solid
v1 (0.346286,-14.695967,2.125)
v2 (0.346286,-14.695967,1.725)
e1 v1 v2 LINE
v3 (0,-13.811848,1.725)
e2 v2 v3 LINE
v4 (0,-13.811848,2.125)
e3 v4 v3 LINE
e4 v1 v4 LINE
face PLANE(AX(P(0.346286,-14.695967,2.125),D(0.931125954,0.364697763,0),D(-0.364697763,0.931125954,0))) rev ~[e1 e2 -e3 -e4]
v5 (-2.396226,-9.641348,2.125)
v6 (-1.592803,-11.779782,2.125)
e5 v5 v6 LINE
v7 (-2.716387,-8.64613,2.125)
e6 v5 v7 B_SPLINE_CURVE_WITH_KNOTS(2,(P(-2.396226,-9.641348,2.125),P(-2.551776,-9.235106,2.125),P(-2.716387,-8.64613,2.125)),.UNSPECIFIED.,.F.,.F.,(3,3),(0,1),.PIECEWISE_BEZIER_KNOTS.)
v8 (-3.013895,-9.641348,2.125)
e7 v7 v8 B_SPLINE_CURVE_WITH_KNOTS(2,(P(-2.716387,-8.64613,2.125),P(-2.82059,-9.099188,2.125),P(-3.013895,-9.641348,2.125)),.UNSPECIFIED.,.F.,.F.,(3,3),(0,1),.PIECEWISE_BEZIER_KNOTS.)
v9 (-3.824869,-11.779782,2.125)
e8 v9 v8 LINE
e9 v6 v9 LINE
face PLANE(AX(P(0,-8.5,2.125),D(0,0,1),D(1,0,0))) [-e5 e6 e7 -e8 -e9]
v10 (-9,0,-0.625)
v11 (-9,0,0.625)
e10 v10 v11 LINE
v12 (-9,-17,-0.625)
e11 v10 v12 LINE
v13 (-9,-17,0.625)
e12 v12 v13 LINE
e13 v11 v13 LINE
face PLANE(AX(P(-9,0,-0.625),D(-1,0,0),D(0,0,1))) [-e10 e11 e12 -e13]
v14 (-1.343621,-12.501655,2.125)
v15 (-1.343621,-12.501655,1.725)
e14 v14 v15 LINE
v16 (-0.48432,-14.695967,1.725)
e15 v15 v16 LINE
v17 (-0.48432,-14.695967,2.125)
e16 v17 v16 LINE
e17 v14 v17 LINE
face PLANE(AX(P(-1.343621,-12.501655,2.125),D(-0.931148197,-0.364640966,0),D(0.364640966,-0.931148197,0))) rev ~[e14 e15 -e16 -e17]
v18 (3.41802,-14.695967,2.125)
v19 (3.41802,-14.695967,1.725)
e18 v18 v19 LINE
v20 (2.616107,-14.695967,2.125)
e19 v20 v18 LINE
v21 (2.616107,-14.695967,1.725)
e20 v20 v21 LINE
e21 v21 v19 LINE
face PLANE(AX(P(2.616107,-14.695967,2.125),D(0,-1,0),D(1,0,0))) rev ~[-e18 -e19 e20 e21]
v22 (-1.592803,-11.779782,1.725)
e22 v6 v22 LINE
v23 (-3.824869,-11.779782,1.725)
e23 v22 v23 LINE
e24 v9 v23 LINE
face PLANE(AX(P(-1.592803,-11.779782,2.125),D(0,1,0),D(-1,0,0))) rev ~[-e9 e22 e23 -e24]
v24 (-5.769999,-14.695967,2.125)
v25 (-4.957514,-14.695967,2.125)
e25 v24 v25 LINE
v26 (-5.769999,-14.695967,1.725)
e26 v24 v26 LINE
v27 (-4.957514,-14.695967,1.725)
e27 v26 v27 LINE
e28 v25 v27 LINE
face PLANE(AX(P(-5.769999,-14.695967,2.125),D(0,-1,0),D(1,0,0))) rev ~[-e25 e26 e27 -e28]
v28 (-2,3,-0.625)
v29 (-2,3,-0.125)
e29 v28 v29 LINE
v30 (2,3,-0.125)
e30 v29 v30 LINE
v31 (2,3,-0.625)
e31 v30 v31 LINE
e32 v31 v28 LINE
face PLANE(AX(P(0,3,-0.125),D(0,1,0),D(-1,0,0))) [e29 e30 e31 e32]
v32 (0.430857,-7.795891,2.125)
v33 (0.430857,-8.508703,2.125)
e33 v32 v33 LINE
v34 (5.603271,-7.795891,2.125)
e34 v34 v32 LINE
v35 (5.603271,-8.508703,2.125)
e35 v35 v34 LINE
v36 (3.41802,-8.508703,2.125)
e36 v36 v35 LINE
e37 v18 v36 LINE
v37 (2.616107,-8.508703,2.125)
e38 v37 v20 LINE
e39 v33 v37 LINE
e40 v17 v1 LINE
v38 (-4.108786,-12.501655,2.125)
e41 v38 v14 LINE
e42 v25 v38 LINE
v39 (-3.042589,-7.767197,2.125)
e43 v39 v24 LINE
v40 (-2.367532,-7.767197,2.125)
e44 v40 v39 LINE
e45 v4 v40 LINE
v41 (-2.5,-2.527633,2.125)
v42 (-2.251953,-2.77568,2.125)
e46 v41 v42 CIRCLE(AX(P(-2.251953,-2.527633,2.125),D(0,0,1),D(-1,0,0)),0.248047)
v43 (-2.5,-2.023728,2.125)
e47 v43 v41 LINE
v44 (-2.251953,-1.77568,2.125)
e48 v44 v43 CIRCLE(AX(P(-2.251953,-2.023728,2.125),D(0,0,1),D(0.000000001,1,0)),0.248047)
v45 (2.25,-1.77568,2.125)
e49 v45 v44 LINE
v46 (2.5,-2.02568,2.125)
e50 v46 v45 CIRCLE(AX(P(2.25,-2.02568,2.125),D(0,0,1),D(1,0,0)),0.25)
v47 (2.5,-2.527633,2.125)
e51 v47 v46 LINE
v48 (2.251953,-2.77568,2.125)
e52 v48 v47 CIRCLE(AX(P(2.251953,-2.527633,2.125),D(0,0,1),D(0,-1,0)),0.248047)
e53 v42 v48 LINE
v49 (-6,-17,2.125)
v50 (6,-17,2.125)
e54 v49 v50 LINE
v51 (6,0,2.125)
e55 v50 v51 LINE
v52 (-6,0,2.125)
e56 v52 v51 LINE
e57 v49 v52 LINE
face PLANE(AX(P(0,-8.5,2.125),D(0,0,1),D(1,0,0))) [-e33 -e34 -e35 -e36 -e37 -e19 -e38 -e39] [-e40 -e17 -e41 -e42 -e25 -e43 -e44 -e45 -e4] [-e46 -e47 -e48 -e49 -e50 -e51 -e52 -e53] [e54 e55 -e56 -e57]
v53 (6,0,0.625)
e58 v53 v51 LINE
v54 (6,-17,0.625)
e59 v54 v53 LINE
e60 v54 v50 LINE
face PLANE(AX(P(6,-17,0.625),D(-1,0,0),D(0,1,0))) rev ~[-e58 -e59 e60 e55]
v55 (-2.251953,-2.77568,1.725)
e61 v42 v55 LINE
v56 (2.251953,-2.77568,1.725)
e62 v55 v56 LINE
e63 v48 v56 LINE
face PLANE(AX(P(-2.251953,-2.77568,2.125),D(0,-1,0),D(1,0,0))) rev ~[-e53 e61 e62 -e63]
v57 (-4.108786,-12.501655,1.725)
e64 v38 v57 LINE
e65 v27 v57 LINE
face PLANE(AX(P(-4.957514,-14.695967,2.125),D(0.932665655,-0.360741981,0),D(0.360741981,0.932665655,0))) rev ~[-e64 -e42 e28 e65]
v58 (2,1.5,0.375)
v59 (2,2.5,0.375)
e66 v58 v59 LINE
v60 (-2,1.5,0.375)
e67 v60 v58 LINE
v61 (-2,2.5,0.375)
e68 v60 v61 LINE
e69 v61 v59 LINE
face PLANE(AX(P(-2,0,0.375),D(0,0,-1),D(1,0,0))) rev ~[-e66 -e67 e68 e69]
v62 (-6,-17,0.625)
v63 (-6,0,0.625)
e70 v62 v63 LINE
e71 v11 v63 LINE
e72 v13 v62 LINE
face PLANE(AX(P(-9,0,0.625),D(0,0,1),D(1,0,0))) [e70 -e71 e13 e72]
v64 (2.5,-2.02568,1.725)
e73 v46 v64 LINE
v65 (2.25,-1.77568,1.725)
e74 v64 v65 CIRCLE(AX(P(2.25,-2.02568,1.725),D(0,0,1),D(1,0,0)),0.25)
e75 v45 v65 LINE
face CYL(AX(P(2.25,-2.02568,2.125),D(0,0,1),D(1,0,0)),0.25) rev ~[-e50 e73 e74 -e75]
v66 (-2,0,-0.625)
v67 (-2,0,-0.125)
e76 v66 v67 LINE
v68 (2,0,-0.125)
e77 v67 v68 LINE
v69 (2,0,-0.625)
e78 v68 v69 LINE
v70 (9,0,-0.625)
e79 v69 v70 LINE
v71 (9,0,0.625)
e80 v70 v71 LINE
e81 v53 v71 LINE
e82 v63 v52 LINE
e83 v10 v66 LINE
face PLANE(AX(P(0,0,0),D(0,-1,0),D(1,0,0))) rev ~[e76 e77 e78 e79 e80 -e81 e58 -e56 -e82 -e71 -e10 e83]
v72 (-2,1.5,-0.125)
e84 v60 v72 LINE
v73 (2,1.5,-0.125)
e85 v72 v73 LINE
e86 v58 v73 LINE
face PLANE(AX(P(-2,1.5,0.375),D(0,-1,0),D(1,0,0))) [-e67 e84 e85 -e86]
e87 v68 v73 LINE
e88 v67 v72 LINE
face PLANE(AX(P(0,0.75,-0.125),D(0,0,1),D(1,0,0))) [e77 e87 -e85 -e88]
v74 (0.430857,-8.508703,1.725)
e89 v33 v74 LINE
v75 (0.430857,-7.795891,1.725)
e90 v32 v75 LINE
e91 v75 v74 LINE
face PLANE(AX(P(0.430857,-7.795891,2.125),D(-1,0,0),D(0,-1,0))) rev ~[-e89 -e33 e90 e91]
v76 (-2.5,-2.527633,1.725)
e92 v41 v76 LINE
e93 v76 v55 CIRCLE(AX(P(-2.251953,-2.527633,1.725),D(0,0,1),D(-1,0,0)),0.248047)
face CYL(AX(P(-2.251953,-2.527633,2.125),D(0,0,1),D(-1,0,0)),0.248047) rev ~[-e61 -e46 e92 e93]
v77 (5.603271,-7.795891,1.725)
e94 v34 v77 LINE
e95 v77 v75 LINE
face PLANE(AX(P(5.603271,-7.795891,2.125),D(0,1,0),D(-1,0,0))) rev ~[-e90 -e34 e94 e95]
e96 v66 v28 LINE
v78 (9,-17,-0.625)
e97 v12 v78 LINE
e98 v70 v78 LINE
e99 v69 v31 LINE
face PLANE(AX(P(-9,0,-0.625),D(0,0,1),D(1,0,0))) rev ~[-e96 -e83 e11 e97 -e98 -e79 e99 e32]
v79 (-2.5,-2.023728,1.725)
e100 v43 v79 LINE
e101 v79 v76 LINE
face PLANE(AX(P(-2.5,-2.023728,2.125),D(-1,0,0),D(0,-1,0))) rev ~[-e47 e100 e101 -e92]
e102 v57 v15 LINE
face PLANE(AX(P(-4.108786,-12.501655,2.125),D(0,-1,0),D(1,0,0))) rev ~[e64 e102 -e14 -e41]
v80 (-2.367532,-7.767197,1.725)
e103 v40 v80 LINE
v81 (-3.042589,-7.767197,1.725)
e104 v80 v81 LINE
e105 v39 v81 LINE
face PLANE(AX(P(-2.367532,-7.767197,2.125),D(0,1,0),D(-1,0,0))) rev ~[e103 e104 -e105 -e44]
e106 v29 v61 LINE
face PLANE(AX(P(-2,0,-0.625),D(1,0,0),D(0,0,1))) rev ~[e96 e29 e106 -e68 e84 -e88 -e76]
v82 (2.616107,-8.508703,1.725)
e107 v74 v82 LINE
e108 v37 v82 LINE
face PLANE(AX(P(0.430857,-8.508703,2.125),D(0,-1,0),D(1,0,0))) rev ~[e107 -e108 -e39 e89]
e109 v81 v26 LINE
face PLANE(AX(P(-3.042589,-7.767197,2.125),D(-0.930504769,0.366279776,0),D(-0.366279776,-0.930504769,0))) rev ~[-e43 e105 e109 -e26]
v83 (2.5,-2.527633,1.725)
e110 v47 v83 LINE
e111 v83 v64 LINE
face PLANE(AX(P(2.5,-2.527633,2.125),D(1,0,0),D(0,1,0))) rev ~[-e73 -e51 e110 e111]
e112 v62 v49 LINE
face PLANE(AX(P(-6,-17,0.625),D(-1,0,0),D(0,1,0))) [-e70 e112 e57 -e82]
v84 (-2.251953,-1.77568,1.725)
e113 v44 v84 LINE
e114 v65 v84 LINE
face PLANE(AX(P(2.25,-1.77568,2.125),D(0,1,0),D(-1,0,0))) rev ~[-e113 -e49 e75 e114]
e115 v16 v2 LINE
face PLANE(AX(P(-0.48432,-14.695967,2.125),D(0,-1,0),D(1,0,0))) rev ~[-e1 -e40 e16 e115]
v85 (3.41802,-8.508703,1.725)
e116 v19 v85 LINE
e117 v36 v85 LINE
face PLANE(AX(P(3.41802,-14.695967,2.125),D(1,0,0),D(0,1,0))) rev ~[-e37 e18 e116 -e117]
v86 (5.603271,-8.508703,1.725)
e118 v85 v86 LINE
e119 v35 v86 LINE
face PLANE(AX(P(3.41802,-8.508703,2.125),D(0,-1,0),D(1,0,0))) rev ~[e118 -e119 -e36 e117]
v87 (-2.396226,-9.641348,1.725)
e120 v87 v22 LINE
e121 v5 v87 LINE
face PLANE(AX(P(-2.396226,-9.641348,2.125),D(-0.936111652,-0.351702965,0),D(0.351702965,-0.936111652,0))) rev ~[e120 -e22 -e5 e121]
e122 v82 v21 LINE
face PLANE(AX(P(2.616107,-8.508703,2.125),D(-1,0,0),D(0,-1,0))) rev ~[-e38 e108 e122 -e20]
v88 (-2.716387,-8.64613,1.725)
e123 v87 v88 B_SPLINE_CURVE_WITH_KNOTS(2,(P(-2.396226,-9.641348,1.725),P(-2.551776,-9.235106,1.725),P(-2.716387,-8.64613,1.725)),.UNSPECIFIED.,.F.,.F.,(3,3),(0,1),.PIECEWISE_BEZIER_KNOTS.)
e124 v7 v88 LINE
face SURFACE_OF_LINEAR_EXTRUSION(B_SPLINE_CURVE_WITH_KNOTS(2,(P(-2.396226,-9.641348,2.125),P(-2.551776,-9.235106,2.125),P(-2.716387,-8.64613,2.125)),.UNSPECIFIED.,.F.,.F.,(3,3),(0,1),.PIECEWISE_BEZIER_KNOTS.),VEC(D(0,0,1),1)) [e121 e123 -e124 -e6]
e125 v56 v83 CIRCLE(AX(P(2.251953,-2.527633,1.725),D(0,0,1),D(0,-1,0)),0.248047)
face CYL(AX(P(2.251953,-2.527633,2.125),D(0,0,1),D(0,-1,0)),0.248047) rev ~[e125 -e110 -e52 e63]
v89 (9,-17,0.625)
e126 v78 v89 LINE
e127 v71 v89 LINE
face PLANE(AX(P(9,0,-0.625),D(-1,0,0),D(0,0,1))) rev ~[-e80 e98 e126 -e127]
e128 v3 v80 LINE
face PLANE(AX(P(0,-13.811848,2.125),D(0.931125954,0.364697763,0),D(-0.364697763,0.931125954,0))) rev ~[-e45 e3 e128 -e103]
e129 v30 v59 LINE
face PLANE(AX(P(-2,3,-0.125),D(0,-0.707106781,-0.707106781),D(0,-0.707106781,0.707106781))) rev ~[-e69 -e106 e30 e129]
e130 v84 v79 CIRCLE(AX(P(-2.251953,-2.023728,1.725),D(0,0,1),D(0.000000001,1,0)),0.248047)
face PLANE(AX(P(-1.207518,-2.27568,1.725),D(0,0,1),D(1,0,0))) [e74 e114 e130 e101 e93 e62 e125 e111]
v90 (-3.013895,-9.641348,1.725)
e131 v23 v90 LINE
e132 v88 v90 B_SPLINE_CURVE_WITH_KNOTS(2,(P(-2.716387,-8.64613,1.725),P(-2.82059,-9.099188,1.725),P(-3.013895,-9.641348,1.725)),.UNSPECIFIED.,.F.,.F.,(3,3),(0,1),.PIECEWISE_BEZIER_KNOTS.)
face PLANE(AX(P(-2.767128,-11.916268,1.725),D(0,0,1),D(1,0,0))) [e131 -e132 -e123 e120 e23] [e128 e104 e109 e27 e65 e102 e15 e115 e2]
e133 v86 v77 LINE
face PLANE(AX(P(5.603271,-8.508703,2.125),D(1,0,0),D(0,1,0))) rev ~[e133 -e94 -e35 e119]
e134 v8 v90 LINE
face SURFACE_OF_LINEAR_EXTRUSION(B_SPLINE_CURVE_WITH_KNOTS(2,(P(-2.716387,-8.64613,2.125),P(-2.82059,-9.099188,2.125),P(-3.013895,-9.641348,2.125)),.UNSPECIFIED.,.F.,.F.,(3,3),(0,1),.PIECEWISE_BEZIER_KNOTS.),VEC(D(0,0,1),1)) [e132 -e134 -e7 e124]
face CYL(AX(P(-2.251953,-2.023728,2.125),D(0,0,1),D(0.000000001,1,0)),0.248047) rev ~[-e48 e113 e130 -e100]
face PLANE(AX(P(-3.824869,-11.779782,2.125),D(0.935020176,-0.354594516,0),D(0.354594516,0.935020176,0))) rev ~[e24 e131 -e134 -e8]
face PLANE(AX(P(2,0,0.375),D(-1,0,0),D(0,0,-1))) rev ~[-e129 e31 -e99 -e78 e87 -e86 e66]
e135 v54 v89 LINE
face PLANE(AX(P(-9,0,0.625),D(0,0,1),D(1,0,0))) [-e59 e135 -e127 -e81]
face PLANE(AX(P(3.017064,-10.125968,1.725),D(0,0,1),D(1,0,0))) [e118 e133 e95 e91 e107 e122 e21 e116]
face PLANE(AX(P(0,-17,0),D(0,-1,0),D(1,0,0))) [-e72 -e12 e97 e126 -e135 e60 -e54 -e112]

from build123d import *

# Parameters (mm, degrees)
F0_W      = 18
F0_H      = 1.25
F1_DEPTH  = 17
F2_W      = 12
F2_H      = 17
F3_DEPTH  = 1.5
F5_DEPTH  = 3
F6_W      = 4
F6_H      = 1.5
F7_DEPTH  = 0.5
F9_DEPTH  = 25
F11_DEPTH = 0.4


with BuildPart() as f1:
    # F0 (on Front) → F1 (new body)
    with BuildSketch(Plane.XZ):
        Rectangle(F0_W, F0_H)
    extrude(amount=F1_DEPTH)

    # F2 (on face) → F3 (join)
    with BuildSketch(Plane.XY.offset(0.625)):
        with Locations((0, -8.5)):
            Rectangle(F2_W, F2_H)
    extrude(amount=F3_DEPTH)

    # F4 (on face) → F5 (join)
    with BuildSketch(Plane(origin=(0, 0, 0), x_dir=(-1, 0, 0), z_dir=(0, 1, 0))):
        Polygon((-2, 0.375), (-2, -0.625), (0, -0.625), (2, -0.625), (2, 0.375), align=None)
    extrude(amount=F5_DEPTH)

    # F6 (on face) → F7 (cut)
    with BuildSketch(Plane.XY.offset(0.375)):
        with Locations((0, 0.75)):
            Rectangle(F6_W, F6_H)
    extrude(amount=-F7_DEPTH, mode=Mode.SUBTRACT)

    # F8 (on face) → F9 (cut)
    with BuildSketch(Plane(origin=(-2, 0, 0), x_dir=(0, -1, 0), z_dir=(-1, 0, 0))):
        Polygon((-3, 0.375), (-3, -0.125), (-2.5, 0.375), align=None)
    extrude(amount=-F9_DEPTH, mode=Mode.SUBTRACT)

    # F10 (on face) → F11 (cut)
    with BuildSketch(Plane.XY.offset(2.125)):
        with BuildLine():
            Line((0, -2.7756802738), (0, -1.7756802738))
            Line((0, -1.7756802738), (-2.2519526784, -1.7756802738))
            ThreePointArc((-2.2519526784, -1.7756802738), (-2.4273486216, -1.8483316522), (-2.5, -2.0237275953))
            Line((-2.5, -2.0237275953), (-2.5, -2.5276329522))
            ThreePointArc((-2.5, -2.5276329522), (-2.4273486216, -2.7030288953), (-2.2519526784, -2.7756802738))
            Line((-2.2519526784, -2.7756802738), (0, -2.7756802738))
        make_face()
        with BuildLine():
            Line((2.25, -1.7756802738), (0, -1.7756802738))
            Line((0, -1.7756802738), (0, -2.7756802738))
            Line((0, -2.7756802738), (2.2519526784, -2.7756802738))
            ThreePointArc((2.2519526784, -2.7756802738), (2.4273486216, -2.7030288953), (2.5, -2.5276329522))
            Line((2.5, -2.5276329522), (2.5, -2.0256802738))
            ThreePointArc((2.5, -2.0256802738), (2.4267766953, -1.8489035785), (2.25, -1.7756802738))
        make_face()
        Polygon((0, -14.6959666163), (0, -13.8118481482), (-2.3675321166, -7.7671974242), (-3.0425887489, -7.7671974242), (-5.7699987665, -14.6959666163), (-4.9575144977, -14.6959666163), (-4.1087855775, -12.501655013), (-1.3436207146, -12.501655013), (-0.4843204378, -14.6959666163), align=None)
        with BuildLine():
            Line((-2.396225799, -9.6413479402), (-1.592802693, -11.7797823726))
            Line((-1.592802693, -11.7797823726), (-3.8248691415, -11.7797823726))
            Line((-3.8248691415, -11.7797823726), (-3.0138950665, -9.6413479402))
            add(Edge.make_bspline(
                [(-2.7163868863, -8.6461302206), (-2.8205902591, -9.0991883631), (-3.0138950665, -9.6413479402)],
                knots=[0, 0, 0, 1, 1, 1], degree=2))
            add(Edge.make_bspline(
                [(-2.396225799, -9.6413479402), (-2.5517757612, -9.2351058058), (-2.7163868863, -8.6461302206)],
                knots=[0, 0, 0, 1, 1, 1], degree=2))
        make_face(mode=Mode.SUBTRACT)
        Polygon((2.6161074505, -14.6959666163), (3.4180203626, -14.6959666163), (3.4180203626, -8.5087025841), (5.6032708031, -8.5087025841), (5.6032708031, -7.7958911066), (0.43085701, -7.7958911066), (0.43085701, -8.5087025841), (2.6161074505, -8.5087025841), align=None)
        Polygon((0.3462861567, -14.6959666163), (0, -13.8118481482), (0, -14.6959666163), align=None)
    extrude(amount=-F11_DEPTH, mode=Mode.SUBTRACT)


solid = f1.part
